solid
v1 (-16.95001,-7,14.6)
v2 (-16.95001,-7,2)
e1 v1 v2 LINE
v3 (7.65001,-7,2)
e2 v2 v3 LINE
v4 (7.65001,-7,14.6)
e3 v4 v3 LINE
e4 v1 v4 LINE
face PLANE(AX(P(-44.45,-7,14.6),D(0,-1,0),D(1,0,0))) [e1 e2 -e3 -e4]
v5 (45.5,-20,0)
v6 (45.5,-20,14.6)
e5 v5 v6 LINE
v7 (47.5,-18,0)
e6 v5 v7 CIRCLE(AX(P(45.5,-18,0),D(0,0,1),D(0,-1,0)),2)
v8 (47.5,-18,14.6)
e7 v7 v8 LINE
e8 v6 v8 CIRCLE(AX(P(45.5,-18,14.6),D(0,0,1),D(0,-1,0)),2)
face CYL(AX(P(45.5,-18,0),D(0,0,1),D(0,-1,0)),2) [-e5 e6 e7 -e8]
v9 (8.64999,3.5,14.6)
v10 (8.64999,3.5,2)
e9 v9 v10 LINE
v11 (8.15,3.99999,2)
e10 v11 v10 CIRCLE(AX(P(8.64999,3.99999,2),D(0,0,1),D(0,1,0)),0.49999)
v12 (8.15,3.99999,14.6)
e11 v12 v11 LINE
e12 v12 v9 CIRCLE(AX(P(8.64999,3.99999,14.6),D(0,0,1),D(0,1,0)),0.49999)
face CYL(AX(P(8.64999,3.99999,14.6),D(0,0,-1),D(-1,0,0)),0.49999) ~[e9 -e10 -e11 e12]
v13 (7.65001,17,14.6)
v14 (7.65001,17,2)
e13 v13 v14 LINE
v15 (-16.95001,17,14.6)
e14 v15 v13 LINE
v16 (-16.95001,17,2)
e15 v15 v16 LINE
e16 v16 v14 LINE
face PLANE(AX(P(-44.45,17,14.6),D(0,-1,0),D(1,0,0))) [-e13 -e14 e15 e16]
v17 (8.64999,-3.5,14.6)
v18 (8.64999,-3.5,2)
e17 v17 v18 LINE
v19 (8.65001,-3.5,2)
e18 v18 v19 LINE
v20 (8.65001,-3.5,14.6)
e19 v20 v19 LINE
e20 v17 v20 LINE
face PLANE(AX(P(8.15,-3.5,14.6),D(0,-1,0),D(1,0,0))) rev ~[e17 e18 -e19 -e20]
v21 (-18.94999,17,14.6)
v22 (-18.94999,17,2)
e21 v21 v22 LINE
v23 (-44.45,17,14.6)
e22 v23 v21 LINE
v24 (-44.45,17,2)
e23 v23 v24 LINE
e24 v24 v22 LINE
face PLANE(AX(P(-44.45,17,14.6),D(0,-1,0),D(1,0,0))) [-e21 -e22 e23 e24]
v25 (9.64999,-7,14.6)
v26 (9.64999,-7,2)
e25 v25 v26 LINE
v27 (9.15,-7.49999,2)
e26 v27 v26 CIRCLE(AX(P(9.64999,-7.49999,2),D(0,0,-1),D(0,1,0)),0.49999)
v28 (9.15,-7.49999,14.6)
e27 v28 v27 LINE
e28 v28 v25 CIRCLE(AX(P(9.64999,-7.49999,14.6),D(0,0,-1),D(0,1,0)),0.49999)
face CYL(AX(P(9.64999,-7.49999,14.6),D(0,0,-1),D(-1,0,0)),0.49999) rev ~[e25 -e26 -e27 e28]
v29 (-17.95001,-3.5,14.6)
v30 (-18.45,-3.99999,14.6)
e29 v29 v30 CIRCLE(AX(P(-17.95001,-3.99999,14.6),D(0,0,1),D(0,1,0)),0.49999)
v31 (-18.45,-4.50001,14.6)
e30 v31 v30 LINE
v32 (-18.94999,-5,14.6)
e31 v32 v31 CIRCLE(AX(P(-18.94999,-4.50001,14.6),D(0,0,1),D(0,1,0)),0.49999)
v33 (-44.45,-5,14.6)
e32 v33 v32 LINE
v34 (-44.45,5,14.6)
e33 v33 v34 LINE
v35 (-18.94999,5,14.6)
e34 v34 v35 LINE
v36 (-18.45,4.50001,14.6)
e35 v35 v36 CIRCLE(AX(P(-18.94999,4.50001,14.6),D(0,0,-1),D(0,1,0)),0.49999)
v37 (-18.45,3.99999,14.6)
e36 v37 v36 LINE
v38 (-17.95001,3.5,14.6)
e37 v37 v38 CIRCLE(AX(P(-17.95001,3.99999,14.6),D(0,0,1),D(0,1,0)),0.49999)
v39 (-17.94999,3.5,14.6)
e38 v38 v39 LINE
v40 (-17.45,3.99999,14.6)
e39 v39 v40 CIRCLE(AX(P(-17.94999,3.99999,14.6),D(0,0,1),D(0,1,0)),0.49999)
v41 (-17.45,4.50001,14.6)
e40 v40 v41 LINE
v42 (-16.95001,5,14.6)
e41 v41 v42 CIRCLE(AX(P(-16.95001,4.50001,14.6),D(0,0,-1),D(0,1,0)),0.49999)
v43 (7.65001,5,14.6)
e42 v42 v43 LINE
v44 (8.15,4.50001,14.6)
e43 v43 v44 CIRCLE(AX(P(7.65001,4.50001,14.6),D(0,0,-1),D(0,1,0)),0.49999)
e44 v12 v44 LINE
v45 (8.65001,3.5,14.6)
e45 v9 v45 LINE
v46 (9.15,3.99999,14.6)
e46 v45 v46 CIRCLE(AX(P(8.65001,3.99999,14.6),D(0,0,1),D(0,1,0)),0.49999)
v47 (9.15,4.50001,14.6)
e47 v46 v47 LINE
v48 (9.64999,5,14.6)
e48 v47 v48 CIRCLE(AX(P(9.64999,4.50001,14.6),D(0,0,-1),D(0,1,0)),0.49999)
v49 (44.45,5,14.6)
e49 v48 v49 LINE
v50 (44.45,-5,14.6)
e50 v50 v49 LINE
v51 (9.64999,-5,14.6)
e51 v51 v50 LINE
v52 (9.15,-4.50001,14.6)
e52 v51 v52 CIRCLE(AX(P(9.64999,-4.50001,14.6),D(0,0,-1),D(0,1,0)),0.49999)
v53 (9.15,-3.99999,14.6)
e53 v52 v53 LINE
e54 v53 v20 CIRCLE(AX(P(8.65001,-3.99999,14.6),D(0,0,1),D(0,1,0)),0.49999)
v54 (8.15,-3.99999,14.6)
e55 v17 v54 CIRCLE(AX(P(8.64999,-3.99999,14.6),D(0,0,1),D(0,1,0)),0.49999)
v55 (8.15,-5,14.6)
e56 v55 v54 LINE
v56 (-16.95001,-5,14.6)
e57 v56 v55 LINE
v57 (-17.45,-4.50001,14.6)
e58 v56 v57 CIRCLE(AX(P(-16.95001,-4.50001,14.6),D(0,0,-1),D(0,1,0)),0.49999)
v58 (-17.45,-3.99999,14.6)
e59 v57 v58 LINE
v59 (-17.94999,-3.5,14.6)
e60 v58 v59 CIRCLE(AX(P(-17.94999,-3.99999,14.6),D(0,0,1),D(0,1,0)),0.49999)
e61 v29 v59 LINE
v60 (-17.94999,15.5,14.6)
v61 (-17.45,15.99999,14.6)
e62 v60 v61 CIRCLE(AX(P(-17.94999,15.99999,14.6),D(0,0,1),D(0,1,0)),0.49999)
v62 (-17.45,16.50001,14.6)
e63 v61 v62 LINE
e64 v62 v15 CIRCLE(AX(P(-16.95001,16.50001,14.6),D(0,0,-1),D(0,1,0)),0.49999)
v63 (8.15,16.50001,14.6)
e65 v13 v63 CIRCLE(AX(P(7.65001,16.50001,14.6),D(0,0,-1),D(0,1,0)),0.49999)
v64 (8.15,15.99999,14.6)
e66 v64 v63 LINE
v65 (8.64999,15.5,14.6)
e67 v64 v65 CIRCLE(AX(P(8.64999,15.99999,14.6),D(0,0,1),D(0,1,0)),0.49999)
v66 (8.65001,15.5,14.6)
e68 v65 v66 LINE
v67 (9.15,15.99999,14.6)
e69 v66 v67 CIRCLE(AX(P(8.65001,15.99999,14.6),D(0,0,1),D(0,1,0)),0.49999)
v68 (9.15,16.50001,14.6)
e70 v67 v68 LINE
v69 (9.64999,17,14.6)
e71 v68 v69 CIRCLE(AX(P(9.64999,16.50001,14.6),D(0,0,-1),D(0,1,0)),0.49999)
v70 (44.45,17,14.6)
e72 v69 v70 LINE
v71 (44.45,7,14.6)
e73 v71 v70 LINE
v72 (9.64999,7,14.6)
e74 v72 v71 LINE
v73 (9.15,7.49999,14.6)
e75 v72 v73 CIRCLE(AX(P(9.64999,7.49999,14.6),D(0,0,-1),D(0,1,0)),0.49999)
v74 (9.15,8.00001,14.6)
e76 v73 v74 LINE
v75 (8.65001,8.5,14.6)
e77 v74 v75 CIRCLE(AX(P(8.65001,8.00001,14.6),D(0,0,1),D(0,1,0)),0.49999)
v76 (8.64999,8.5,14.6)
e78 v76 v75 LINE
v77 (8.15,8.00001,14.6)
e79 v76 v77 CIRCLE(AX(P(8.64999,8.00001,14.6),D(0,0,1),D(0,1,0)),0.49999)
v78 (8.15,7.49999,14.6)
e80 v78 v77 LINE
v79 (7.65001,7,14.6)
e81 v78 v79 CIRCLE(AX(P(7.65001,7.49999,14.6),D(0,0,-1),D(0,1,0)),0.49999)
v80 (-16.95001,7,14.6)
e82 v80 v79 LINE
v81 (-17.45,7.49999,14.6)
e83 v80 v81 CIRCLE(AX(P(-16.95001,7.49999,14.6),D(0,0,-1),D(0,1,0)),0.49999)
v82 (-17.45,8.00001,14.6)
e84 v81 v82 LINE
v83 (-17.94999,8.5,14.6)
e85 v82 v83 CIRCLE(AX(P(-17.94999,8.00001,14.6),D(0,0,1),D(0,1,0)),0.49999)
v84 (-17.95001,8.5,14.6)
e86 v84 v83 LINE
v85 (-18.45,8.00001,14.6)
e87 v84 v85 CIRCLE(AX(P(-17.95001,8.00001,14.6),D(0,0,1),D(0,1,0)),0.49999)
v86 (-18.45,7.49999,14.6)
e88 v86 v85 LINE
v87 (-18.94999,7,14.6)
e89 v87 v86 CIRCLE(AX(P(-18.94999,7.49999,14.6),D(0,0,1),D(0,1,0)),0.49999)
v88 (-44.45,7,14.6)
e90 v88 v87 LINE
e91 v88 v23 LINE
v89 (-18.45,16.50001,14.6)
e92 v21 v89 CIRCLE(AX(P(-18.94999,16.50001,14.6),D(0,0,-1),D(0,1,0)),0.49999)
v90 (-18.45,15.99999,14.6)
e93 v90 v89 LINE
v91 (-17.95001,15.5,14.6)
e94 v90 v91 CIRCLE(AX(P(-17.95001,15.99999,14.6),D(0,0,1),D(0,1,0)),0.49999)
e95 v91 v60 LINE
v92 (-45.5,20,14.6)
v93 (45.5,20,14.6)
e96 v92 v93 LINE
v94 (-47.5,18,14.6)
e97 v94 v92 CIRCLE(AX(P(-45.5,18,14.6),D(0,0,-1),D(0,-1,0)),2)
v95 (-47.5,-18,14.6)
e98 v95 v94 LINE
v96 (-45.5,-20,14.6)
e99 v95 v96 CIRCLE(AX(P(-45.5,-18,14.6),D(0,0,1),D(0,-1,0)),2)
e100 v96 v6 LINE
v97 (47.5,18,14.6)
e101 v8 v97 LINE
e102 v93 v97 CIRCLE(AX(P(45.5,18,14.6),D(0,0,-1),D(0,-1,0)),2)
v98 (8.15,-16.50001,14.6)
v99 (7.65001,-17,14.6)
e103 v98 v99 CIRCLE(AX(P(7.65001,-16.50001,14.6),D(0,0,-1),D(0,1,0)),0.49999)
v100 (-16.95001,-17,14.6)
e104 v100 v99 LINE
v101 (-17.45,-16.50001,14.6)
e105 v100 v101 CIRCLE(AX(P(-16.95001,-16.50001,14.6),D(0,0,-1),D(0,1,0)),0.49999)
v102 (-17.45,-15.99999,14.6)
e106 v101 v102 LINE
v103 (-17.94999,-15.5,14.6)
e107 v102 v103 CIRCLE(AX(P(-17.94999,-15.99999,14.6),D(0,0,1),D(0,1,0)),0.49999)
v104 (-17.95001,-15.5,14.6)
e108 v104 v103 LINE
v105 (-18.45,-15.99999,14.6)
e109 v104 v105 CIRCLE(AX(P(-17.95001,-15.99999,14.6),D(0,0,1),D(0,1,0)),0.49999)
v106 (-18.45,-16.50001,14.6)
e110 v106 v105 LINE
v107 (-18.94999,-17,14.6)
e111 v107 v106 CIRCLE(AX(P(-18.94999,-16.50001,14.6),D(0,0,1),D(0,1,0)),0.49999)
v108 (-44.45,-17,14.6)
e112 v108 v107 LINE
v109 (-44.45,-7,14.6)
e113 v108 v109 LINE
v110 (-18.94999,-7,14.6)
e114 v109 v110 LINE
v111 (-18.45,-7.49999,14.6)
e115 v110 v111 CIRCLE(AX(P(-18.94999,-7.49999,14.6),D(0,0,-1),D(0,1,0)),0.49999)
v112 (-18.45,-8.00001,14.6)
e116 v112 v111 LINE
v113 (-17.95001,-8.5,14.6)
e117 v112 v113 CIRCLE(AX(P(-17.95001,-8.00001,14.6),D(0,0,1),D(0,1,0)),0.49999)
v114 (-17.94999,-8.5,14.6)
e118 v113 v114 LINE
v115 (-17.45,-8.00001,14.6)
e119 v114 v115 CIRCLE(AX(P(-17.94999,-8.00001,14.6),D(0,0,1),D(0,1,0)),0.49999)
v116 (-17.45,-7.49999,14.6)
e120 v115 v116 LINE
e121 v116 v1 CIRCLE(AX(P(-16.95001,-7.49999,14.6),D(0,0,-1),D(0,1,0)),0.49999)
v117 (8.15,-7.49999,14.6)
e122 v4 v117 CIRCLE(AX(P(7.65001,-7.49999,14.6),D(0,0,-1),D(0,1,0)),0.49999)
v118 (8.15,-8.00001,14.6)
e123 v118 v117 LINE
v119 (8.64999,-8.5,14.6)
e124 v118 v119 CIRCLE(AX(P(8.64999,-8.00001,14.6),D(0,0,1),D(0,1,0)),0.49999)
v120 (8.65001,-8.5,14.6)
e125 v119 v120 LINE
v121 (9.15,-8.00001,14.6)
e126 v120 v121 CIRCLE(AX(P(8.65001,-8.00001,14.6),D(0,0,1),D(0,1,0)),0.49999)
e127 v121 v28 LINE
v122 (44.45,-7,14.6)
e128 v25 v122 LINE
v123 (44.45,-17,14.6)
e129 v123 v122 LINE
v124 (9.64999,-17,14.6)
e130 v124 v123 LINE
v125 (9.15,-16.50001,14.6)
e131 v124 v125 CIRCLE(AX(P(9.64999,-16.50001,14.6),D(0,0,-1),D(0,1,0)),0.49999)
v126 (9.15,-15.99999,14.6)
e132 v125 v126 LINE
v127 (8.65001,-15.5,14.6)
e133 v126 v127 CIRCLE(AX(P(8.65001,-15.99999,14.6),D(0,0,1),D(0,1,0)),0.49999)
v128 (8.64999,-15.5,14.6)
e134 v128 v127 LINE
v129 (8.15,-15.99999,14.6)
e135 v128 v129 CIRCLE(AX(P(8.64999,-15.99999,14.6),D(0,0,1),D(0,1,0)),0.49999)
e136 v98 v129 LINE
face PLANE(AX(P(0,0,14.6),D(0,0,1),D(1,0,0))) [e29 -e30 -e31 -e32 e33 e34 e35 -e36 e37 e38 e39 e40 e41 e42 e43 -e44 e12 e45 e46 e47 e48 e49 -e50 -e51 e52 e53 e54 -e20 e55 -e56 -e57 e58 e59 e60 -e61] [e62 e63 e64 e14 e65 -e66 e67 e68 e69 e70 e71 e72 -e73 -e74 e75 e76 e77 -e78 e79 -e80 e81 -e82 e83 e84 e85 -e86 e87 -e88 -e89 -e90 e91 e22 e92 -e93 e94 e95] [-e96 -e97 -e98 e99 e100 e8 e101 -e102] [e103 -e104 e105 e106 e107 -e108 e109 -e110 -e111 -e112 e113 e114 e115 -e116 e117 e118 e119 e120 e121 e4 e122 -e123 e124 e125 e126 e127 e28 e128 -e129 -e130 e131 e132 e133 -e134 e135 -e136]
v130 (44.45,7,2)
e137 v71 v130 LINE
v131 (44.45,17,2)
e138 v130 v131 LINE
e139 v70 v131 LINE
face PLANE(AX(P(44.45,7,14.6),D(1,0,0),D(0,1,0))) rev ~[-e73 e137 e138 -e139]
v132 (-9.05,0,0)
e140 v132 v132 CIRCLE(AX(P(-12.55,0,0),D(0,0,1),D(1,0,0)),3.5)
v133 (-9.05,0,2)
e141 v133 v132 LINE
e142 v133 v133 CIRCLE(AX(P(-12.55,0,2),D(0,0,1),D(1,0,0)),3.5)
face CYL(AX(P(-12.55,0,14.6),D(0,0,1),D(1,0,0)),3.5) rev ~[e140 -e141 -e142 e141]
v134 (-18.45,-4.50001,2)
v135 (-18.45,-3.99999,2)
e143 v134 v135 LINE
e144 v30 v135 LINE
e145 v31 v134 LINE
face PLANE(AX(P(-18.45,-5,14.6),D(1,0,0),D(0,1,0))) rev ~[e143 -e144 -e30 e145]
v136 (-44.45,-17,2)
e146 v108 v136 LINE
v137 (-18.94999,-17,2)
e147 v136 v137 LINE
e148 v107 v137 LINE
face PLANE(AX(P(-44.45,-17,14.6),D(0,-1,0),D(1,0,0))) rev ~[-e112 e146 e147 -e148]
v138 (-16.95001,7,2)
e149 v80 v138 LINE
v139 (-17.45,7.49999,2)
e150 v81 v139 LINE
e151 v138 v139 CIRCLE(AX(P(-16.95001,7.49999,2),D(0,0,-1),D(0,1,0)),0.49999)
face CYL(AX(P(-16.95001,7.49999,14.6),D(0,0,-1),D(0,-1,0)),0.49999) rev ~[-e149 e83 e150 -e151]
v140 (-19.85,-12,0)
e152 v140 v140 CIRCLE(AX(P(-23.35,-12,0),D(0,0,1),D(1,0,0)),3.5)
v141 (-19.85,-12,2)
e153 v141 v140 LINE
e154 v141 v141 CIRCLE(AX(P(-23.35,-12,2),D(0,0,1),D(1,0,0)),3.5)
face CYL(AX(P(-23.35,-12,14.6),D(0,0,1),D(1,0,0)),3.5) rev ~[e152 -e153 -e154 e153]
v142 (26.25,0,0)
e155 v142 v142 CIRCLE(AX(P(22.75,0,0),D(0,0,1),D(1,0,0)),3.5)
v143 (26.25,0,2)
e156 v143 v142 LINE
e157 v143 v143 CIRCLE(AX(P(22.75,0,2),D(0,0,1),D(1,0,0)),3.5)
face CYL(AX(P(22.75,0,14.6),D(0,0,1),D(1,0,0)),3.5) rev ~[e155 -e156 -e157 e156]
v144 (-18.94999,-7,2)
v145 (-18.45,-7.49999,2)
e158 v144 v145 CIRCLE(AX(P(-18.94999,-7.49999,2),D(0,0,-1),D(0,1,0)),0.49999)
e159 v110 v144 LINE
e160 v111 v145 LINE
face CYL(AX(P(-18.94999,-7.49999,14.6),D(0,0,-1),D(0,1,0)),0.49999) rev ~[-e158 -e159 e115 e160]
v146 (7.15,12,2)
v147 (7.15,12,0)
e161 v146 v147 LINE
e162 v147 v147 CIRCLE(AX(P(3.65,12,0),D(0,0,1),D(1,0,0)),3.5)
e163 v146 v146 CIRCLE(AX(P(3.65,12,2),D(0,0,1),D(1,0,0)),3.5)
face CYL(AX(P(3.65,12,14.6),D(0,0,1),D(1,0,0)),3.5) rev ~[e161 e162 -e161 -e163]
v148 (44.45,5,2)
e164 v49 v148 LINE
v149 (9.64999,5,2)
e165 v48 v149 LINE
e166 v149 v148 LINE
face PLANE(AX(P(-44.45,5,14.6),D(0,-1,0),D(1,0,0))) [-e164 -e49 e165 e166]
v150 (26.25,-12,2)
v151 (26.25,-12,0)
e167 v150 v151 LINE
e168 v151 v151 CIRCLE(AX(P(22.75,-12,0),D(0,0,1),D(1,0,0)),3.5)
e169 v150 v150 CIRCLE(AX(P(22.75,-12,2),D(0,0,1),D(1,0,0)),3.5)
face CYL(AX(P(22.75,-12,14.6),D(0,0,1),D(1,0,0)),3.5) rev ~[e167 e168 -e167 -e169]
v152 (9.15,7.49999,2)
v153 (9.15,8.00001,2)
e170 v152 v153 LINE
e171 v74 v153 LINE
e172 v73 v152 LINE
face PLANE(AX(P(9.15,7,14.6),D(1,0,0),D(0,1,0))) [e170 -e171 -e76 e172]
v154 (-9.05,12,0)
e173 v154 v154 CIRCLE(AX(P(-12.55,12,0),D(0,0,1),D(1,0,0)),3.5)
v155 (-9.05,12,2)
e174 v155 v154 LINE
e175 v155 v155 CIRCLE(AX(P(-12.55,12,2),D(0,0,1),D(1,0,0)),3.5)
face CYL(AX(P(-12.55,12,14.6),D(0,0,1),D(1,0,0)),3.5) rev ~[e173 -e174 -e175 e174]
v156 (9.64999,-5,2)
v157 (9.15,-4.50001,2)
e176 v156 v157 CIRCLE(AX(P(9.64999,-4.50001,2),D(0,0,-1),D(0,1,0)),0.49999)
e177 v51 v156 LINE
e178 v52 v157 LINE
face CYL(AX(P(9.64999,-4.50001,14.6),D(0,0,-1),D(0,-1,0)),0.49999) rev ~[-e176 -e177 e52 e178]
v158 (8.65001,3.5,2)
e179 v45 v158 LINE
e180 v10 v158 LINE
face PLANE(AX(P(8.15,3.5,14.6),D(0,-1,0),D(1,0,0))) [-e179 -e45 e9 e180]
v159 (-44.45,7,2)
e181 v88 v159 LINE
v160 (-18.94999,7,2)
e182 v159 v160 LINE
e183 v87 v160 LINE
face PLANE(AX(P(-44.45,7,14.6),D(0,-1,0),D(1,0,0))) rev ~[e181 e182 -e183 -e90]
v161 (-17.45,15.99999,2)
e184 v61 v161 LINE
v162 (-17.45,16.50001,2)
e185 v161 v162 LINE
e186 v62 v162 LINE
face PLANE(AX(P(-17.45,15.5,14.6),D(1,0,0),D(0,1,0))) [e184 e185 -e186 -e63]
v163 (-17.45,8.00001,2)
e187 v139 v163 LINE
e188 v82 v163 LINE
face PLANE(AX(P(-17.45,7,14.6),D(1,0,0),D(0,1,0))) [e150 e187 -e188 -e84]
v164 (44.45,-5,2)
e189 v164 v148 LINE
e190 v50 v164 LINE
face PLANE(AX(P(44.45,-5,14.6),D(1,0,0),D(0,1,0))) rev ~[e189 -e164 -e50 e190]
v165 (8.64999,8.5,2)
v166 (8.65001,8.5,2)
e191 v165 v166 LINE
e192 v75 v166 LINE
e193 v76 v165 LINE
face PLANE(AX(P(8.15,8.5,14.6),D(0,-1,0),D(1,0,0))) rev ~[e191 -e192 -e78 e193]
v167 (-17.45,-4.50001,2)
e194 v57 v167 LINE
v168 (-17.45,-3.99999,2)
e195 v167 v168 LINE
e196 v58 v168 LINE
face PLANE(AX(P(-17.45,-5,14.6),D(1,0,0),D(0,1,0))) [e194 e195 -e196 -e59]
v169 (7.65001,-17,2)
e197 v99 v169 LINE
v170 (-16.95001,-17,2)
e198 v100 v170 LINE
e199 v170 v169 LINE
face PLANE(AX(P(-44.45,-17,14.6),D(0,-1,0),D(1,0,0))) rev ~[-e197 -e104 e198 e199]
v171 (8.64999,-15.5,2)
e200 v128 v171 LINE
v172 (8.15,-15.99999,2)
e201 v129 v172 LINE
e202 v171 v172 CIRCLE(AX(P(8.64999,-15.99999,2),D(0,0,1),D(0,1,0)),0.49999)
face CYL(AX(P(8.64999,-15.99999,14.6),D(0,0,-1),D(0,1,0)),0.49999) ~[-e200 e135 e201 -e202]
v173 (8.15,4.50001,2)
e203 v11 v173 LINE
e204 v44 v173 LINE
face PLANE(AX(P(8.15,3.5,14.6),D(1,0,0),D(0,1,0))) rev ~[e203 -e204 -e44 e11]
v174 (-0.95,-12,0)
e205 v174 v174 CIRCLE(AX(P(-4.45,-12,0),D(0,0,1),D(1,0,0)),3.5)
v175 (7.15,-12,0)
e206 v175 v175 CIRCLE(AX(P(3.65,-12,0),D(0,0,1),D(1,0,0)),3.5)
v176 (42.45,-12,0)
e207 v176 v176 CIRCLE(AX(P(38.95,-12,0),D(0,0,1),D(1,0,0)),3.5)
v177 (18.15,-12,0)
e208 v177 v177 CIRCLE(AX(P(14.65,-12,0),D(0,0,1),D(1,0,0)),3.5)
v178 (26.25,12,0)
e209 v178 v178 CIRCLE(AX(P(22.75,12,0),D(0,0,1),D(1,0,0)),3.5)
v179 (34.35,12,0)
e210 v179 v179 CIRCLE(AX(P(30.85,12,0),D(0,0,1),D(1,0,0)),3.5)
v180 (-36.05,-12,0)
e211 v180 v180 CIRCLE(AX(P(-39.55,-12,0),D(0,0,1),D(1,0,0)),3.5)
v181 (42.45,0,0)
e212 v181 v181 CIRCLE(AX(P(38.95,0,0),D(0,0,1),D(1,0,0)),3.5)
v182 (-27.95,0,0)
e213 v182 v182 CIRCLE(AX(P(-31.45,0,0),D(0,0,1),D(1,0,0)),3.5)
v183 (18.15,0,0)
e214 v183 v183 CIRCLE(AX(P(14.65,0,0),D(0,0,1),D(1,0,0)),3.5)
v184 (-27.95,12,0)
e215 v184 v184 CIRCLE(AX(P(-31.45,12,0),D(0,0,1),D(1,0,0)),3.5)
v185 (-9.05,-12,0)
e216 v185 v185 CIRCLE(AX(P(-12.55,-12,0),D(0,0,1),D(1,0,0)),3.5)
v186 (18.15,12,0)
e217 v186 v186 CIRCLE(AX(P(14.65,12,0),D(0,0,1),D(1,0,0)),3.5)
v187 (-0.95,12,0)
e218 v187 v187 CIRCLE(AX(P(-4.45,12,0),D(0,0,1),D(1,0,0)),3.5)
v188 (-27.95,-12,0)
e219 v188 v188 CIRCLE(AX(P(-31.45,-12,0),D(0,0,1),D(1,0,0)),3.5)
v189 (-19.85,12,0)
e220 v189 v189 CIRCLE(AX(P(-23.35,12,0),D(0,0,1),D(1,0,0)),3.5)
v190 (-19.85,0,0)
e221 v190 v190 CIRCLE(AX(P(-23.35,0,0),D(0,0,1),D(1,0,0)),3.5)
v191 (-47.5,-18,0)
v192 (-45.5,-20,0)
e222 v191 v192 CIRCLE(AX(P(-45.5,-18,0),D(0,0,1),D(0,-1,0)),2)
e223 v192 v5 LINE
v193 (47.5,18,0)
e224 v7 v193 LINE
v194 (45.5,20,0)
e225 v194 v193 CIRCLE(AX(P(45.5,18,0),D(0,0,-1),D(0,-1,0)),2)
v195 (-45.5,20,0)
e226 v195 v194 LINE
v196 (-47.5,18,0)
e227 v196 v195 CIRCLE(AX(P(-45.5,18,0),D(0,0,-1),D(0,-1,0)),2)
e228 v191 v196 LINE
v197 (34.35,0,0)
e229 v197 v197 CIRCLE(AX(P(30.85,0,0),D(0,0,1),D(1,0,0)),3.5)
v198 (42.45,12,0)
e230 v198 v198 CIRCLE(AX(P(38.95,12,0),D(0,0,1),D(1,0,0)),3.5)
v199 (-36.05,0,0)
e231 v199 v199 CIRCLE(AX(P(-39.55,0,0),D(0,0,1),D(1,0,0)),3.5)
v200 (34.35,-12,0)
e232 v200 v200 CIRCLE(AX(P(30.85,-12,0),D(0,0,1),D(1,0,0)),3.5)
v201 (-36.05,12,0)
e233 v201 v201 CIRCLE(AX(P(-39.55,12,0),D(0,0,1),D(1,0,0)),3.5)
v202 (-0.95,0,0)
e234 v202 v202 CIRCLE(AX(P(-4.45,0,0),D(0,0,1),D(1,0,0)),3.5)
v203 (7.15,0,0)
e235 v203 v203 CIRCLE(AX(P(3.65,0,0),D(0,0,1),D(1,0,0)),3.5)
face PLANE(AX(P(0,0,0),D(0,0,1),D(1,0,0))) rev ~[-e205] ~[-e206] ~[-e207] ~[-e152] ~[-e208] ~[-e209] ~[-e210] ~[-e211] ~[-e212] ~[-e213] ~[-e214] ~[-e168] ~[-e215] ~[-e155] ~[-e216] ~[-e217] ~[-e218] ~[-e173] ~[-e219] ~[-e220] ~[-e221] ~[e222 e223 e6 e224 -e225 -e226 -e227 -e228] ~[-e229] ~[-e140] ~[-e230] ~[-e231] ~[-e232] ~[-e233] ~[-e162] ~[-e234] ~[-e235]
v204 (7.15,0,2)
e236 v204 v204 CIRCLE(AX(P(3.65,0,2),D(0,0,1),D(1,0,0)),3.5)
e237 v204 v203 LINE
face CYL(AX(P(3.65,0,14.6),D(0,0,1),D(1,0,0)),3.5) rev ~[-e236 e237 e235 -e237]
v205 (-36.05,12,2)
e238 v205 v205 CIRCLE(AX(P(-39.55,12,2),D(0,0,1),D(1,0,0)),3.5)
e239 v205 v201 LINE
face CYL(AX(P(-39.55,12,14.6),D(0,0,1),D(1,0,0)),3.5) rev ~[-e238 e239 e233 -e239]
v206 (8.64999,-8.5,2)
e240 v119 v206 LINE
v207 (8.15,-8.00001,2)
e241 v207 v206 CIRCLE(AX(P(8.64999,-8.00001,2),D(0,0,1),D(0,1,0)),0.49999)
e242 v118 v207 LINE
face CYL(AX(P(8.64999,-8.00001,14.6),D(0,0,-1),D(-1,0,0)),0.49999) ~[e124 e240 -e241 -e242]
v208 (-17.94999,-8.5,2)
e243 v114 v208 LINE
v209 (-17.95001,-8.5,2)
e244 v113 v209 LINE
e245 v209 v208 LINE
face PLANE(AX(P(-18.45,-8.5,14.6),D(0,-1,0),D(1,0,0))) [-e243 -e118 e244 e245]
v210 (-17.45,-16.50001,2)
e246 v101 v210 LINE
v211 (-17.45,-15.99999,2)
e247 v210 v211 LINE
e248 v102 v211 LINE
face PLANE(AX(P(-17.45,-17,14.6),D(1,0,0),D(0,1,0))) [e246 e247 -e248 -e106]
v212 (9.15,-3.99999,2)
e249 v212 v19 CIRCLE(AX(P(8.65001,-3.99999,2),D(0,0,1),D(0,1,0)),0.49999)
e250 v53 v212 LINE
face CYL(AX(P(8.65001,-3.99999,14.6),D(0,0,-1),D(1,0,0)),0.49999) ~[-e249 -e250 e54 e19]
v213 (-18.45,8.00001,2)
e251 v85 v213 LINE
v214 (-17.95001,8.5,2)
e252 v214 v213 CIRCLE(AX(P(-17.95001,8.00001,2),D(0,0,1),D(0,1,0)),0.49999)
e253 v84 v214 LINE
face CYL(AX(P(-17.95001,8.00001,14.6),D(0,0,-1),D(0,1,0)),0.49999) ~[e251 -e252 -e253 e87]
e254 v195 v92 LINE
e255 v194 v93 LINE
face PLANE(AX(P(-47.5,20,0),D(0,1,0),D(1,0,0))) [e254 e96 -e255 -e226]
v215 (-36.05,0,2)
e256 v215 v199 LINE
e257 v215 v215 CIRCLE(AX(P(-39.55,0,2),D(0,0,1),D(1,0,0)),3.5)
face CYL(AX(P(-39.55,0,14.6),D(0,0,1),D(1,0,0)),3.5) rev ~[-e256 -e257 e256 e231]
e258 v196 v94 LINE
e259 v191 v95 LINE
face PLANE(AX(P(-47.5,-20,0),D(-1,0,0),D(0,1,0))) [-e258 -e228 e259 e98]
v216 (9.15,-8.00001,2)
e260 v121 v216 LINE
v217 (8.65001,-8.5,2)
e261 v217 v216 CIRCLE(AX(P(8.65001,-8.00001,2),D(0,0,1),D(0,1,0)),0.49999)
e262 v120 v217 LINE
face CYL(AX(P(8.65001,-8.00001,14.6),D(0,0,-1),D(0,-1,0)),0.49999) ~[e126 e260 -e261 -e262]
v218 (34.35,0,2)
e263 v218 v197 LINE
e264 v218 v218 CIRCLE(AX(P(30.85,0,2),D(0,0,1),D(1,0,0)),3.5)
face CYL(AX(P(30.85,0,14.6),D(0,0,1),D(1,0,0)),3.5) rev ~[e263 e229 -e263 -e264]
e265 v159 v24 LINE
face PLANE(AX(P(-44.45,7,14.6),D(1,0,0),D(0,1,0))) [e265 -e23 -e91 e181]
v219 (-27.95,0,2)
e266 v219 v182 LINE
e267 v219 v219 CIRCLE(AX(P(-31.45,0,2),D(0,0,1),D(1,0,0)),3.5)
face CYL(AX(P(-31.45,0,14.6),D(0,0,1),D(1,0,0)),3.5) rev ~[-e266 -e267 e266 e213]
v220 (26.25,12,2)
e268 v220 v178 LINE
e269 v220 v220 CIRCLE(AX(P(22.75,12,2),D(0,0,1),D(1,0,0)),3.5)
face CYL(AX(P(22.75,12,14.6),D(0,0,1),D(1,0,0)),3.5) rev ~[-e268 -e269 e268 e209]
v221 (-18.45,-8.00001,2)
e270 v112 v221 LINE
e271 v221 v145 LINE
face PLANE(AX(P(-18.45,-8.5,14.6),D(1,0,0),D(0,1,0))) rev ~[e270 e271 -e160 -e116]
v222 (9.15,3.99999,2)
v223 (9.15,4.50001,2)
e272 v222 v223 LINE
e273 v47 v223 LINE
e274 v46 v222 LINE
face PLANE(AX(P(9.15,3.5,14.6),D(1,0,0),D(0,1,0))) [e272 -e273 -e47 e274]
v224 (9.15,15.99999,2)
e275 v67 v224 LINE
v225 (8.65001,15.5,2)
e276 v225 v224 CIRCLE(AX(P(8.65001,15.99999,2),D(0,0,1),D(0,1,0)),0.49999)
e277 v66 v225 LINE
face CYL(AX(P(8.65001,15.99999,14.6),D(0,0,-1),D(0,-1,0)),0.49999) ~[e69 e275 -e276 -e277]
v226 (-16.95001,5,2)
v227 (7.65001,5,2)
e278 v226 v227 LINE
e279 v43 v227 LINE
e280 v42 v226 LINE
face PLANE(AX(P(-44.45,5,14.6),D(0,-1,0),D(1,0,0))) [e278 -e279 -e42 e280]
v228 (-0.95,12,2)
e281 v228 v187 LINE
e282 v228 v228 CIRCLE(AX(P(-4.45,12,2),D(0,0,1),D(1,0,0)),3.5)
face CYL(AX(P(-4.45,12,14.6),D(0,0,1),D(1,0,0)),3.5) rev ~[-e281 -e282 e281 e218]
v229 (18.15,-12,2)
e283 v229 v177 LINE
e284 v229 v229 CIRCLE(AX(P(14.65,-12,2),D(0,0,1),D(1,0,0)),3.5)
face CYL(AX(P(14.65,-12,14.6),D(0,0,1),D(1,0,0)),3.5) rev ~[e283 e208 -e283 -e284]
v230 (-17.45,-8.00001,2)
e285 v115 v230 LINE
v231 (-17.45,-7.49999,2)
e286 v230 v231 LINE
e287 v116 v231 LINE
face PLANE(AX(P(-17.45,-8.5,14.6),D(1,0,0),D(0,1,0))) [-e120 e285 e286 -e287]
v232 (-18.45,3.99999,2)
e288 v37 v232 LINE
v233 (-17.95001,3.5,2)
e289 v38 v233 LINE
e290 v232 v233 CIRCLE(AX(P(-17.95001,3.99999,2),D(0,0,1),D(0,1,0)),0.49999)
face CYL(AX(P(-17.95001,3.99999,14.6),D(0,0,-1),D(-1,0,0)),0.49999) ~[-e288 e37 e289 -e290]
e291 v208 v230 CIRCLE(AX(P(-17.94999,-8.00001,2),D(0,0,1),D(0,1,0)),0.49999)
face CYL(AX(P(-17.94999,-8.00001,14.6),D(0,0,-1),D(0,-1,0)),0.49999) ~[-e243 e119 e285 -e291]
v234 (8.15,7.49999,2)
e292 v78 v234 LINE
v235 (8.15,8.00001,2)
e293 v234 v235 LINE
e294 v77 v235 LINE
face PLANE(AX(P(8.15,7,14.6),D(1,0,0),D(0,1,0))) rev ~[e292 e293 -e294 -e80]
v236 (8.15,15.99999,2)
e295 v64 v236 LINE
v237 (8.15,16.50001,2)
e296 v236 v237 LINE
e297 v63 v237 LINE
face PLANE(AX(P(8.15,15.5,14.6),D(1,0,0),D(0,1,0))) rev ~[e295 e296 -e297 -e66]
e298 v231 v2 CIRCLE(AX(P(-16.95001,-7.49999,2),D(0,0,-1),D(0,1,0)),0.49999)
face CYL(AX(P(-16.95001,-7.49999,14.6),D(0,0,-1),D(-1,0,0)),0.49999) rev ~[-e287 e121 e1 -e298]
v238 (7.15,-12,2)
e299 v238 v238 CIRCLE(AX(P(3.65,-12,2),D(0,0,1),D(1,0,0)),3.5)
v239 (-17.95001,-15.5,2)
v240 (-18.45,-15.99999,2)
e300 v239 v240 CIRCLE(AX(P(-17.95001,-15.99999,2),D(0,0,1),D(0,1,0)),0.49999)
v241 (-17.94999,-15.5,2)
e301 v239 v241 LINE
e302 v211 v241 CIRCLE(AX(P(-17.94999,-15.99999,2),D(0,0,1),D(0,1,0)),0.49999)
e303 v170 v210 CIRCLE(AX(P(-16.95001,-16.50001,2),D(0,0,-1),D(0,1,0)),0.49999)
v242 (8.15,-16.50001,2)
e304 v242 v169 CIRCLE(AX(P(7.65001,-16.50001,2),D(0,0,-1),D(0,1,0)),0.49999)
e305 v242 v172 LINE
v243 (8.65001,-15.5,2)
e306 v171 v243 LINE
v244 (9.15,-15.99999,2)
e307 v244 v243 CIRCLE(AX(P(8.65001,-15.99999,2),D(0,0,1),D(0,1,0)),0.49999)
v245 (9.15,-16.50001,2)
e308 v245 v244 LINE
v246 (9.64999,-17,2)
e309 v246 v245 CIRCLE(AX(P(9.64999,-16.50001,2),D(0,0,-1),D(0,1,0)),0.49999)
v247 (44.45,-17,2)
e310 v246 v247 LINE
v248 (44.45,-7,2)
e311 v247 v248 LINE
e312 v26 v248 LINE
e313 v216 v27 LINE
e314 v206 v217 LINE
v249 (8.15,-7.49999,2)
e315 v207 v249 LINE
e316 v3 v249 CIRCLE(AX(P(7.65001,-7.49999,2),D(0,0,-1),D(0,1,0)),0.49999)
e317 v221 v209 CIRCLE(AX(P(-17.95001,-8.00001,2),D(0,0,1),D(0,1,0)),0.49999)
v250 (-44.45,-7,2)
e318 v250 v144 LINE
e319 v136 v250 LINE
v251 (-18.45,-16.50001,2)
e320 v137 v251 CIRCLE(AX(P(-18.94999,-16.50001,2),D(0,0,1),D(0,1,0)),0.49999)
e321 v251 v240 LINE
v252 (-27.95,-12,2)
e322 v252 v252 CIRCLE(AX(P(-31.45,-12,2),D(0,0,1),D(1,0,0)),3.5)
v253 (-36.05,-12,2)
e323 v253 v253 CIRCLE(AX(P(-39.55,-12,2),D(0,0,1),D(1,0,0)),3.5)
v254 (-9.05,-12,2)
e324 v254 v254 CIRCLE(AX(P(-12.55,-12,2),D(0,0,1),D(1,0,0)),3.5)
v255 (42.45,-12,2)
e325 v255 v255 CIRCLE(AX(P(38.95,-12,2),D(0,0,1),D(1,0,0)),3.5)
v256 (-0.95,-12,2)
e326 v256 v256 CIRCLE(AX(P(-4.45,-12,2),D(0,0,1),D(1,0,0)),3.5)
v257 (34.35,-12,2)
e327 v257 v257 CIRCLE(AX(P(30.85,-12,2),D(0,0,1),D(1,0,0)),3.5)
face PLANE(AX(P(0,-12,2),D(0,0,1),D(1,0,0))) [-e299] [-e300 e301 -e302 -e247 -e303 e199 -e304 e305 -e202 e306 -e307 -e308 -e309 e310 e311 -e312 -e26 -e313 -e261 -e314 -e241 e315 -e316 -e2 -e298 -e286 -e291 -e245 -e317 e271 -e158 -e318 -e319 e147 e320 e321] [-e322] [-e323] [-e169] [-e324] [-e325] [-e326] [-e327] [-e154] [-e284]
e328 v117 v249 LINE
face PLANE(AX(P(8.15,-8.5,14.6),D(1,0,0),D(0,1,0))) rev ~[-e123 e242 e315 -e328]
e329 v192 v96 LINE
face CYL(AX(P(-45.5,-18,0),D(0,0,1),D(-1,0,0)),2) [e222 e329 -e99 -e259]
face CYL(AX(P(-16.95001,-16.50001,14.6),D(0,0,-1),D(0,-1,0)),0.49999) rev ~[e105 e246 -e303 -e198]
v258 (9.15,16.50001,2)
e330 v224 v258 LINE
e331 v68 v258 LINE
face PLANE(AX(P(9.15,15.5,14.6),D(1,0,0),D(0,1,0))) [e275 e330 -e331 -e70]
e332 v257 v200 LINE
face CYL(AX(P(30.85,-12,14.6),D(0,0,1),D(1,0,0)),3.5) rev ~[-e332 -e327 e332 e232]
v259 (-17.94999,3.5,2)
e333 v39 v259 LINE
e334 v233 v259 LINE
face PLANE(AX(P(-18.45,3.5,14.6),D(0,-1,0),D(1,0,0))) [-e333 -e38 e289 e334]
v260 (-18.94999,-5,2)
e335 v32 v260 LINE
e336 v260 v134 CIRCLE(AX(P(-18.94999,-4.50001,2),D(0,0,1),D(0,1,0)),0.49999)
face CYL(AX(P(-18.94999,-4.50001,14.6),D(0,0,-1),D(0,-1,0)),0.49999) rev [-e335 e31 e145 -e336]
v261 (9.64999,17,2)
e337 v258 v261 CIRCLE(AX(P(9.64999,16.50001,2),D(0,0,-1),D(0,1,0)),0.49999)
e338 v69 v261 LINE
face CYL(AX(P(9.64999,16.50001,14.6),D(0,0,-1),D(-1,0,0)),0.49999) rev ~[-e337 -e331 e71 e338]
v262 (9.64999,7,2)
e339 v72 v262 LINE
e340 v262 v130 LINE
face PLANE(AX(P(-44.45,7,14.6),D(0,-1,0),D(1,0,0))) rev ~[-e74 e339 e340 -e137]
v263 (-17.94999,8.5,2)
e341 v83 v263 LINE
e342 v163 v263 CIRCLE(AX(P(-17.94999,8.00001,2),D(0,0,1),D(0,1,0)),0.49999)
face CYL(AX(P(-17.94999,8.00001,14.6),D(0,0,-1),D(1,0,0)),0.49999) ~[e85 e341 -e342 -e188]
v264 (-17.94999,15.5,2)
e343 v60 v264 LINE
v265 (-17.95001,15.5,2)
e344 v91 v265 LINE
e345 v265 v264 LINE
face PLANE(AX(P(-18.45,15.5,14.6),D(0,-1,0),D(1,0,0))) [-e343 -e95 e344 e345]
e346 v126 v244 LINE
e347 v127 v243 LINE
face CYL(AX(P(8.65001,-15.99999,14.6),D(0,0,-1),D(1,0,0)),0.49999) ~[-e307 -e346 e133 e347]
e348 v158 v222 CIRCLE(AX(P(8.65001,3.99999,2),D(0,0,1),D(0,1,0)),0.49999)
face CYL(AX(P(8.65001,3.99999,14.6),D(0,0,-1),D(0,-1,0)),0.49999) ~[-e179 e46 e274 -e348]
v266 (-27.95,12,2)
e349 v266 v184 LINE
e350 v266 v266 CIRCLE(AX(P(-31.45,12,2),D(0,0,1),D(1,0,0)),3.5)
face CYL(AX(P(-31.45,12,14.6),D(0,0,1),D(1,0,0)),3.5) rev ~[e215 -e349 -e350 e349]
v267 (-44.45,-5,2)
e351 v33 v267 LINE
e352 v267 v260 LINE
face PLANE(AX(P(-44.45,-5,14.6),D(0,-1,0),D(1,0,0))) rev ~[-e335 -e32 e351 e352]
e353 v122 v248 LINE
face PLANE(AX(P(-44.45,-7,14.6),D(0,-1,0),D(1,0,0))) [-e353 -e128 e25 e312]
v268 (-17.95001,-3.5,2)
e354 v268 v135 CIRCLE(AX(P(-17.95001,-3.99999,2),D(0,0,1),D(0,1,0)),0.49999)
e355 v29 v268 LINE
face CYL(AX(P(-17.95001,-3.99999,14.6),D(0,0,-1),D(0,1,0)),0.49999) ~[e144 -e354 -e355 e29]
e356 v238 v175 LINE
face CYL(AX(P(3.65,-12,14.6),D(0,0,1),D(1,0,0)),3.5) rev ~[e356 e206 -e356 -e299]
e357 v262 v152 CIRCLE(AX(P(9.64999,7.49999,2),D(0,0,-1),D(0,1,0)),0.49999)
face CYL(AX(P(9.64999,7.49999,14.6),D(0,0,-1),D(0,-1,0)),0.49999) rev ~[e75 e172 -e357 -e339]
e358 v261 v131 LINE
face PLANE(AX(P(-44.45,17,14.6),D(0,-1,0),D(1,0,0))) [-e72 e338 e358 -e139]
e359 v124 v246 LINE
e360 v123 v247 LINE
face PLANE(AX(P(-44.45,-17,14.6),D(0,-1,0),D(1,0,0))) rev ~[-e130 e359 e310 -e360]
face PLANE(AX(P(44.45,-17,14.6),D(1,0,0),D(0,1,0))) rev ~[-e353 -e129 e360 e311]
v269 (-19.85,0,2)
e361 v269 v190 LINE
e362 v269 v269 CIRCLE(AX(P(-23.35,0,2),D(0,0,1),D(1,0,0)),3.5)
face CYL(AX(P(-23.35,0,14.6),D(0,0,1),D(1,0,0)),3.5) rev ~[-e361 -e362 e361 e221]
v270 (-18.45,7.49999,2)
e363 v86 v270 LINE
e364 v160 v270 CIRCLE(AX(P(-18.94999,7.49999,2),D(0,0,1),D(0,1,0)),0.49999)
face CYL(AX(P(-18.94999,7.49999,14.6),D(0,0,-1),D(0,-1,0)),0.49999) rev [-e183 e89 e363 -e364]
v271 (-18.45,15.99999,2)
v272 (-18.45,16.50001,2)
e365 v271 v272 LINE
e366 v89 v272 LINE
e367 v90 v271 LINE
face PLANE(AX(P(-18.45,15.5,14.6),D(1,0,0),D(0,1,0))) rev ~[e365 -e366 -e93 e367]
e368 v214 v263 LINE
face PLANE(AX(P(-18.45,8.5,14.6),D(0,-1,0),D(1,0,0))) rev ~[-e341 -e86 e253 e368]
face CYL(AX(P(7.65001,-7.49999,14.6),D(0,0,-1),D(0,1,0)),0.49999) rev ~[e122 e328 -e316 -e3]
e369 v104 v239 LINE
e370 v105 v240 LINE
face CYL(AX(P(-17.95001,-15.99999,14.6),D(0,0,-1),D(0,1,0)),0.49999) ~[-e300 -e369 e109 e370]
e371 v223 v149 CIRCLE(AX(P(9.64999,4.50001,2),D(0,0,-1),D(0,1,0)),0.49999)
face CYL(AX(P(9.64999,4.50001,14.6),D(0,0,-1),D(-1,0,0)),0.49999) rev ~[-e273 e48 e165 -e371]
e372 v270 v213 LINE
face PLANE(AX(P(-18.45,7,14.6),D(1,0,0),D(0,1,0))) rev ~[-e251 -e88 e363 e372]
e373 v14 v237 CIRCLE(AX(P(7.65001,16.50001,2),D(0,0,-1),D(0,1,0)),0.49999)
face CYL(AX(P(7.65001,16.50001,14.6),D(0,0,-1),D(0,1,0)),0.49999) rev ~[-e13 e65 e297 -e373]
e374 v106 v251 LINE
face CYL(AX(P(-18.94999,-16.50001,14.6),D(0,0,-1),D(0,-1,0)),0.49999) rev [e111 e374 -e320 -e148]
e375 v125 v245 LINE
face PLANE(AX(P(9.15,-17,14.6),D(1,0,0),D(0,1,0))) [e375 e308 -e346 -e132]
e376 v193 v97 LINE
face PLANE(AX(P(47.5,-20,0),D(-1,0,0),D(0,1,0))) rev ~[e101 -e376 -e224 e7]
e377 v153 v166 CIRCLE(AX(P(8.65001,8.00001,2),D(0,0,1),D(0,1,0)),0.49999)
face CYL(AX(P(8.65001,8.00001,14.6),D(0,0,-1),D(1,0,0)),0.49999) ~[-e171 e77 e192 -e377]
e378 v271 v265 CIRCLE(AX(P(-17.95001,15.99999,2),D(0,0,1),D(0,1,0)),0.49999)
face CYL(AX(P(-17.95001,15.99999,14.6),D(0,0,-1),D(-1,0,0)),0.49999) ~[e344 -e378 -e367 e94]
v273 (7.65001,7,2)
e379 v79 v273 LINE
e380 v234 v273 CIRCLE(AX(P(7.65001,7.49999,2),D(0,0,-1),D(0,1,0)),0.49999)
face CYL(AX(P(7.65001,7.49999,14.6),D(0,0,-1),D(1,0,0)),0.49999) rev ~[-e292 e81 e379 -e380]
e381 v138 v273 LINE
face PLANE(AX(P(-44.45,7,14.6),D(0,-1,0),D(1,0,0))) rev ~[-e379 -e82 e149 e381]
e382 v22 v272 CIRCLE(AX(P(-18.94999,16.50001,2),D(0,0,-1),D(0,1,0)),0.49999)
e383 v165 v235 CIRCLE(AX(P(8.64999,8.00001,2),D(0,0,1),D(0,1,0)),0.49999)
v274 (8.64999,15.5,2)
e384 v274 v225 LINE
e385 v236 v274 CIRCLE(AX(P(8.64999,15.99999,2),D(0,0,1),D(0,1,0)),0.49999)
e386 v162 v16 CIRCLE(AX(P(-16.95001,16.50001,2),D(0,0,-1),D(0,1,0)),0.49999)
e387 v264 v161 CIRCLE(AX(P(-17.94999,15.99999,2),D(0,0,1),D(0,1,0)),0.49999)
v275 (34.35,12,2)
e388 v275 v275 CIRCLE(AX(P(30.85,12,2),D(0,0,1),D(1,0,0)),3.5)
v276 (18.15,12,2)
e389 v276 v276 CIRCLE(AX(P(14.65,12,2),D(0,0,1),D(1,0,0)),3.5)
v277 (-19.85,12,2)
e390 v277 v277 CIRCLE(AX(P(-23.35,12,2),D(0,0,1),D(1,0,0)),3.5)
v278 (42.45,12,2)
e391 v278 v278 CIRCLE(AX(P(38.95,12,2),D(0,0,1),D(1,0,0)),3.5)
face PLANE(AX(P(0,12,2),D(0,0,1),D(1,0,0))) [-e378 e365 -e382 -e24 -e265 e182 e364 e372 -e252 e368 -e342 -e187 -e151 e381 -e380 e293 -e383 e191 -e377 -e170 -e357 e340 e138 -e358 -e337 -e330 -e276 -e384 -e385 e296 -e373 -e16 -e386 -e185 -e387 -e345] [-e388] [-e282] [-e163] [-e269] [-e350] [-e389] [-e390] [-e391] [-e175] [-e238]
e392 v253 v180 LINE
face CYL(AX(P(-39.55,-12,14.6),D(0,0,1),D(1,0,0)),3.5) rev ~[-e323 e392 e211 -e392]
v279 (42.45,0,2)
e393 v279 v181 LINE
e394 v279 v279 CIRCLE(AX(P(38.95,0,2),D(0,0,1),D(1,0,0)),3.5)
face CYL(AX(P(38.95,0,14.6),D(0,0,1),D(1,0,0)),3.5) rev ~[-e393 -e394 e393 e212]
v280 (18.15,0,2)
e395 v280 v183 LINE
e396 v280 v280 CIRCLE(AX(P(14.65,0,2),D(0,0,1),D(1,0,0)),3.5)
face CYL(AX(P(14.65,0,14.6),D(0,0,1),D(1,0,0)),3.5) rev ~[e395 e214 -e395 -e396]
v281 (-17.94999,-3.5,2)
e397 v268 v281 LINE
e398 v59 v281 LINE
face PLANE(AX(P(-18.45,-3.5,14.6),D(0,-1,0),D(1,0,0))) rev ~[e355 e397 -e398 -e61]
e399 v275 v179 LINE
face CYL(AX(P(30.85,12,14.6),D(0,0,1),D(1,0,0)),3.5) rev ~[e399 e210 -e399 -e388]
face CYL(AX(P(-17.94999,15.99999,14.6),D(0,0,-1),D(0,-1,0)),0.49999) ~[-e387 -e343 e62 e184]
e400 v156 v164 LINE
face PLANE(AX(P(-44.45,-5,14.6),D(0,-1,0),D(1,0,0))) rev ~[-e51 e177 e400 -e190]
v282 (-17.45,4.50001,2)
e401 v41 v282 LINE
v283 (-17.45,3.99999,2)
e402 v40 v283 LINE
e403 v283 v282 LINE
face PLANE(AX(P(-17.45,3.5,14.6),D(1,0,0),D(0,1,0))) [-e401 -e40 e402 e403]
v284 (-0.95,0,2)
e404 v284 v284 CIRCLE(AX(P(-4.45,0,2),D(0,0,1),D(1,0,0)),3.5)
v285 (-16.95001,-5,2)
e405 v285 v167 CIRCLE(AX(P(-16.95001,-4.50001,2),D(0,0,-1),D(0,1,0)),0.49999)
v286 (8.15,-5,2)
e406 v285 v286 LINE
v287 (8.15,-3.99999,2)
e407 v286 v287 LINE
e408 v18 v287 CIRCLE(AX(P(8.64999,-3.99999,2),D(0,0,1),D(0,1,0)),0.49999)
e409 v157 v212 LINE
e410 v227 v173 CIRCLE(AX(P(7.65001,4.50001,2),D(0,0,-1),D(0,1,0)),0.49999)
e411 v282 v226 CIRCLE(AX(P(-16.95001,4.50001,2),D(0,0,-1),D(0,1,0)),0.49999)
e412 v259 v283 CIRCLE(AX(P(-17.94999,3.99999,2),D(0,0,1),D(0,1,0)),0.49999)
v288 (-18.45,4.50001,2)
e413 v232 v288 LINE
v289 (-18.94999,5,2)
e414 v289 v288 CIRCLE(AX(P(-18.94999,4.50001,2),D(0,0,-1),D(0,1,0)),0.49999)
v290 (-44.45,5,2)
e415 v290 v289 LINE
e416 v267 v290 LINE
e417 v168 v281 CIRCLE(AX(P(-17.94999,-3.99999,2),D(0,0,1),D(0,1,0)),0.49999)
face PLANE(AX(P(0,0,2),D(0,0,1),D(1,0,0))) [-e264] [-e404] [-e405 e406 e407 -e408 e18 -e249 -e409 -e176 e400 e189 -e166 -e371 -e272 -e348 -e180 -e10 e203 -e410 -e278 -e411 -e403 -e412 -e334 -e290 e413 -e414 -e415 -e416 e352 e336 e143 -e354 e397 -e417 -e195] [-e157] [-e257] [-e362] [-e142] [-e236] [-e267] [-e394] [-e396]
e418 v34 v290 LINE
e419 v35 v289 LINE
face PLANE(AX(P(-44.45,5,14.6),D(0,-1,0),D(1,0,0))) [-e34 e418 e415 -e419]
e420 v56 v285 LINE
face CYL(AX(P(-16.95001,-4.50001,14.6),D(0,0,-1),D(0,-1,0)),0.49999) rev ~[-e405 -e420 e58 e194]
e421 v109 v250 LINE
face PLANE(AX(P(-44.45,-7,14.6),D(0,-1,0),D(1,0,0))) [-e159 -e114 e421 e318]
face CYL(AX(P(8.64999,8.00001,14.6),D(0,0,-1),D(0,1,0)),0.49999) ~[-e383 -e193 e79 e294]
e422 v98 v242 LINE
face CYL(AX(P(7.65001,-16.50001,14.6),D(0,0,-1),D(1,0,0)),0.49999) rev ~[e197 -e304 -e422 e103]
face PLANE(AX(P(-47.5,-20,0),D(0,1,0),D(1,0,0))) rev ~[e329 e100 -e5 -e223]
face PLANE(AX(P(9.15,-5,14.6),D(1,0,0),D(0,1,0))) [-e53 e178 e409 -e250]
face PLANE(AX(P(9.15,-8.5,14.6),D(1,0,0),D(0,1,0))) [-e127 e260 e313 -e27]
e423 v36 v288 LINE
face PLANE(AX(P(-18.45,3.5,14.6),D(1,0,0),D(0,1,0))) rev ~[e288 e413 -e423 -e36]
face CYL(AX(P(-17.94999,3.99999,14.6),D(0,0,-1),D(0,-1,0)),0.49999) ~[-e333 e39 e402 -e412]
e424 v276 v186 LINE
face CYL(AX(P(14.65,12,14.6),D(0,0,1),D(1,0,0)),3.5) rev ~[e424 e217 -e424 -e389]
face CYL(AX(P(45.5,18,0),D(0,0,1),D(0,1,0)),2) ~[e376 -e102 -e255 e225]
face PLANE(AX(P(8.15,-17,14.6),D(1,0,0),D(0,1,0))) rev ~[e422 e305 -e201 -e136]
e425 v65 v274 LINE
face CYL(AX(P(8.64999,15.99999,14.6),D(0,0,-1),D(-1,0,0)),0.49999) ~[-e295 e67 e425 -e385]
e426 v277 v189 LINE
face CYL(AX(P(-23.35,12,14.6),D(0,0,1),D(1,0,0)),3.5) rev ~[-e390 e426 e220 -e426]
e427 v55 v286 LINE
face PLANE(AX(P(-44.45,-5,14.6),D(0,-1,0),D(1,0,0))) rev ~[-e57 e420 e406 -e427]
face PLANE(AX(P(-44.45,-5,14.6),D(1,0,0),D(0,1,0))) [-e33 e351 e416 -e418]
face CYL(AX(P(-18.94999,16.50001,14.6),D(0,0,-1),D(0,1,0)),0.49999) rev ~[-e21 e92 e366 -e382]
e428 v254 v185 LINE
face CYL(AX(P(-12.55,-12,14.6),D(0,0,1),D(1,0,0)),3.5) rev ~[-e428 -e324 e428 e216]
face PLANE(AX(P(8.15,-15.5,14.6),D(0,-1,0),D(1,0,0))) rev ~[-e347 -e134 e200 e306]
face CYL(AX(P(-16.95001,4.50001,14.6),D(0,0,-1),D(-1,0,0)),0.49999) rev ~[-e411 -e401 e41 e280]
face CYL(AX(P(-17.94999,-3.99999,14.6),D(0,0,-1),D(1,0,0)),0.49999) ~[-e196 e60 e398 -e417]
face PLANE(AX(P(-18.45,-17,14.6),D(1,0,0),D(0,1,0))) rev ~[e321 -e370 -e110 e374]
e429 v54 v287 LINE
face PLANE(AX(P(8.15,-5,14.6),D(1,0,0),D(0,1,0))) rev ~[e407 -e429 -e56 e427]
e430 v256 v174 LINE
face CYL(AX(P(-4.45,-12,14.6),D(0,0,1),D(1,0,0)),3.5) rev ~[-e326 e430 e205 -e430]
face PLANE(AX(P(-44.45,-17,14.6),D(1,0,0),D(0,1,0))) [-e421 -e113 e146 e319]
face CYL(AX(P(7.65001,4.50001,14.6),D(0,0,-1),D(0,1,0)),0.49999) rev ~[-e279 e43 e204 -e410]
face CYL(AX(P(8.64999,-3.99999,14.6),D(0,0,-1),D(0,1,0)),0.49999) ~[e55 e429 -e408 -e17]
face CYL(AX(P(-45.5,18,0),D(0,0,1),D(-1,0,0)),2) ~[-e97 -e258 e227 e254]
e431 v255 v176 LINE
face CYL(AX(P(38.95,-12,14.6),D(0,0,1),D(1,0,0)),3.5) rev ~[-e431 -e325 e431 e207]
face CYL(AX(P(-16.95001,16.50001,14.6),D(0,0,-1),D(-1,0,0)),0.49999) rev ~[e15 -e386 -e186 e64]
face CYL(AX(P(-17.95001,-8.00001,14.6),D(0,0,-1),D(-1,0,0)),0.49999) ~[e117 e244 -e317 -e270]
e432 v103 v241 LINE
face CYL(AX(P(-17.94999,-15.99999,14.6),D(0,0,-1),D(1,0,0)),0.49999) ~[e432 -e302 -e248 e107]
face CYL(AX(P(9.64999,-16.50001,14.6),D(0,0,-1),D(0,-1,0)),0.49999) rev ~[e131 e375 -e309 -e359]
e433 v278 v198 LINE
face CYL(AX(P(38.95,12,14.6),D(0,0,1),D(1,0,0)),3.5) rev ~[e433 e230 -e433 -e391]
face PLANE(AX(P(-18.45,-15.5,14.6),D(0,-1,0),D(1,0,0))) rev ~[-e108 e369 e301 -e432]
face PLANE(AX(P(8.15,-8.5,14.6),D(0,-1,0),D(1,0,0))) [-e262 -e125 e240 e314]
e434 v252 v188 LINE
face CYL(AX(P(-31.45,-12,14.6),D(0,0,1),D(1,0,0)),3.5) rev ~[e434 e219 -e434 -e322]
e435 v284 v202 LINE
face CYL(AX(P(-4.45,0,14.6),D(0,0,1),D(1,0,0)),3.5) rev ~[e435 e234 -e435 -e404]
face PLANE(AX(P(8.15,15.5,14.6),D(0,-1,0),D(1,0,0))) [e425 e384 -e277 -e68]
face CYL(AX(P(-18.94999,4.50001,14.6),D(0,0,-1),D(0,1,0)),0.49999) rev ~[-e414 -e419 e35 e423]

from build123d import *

# Parameters (mm, degrees)
F0_W     = 95
F0_H     = 40
F1_DEPTH = 14.6
F2_W     = 88.9
F2_H     = 10
F3_DEPTH = 12.6
F4_W     = 1
F4_H     = 1.5
F5_DEPTH = 12.6
F6_R     = 3.5
F7_DEPTH = 14.601
F8_R     = 2
F9_R     = 0.49999


# Not quite as in the source:
# - a fillet or chamfer is up to 0.001 mm smaller than in the source, because OpenCascade refuses the exact size


with BuildPart() as f1:
    # F0 (on Top) → F1 (new body)
    with BuildSketch(Plane.XY):
        Rectangle(F0_W, F0_H)
    extrude(amount=F1_DEPTH)

    # F2 (on face) → F3 (cut)
    with BuildSketch(Plane.XY.offset(14.6)):
        with Locations((0, 12)):
            Rectangle(F2_W, F2_H)
        Rectangle(F2_W, F2_H)
        with Locations((0, -12)):
            Rectangle(F2_W, F2_H)
    extrude(amount=-F3_DEPTH, mode=Mode.SUBTRACT)

    # F4 (on face) → F5 (join, through all)
    with BuildSketch(Plane.XY.offset(14.6)):
        with Locations((-17.95, 16.25)):
            Rectangle(F4_W, F4_H)
        with Locations((8.65, 16.25)):
            Rectangle(F4_W, F4_H)
        with Locations((8.65, 7.75)):
            Rectangle(F4_W, F4_H)
        with Locations((-17.95, 7.75)):
            Rectangle(F4_W, F4_H)
        with Locations((-17.95, 4.25)):
            Rectangle(F4_W, F4_H)
        with Locations((8.65, 4.25)):
            Rectangle(F4_W, F4_H)
        with Locations((8.65, -16.25)):
            Rectangle(F4_W, F4_H)
        with Locations((-17.95, -16.25)):
            Rectangle(F4_W, F4_H)
        with Locations((-17.95, -4.25)):
            Rectangle(F4_W, F4_H)
        with Locations((-17.95, -7.75)):
            Rectangle(F4_W, F4_H)
        with Locations((8.65, -4.25)):
            Rectangle(F4_W, F4_H)
        with Locations((8.65, -7.75)):
            Rectangle(F4_W, F4_H)
    extrude(amount=-F5_DEPTH)

    # F6 (on face) → F7 (cut, through all)
    with BuildSketch(Plane.XY.offset(14.6)):
        with Locations((-39.55, 12)):
            Circle(F6_R)
        with Locations((-31.45, 12)):
            Circle(F6_R)
        with Locations((-23.35, 12)):
            Circle(F6_R)
        with Locations((-12.55, 12)):
            Circle(F6_R)
        with Locations((-4.45, 12)):
            Circle(F6_R)
        with Locations((3.65, 12)):
            Circle(F6_R)
        with Locations((14.65, 12)):
            Circle(F6_R)
        with Locations((22.75, 12)):
            Circle(F6_R)
        with Locations((30.85, 12)):
            Circle(F6_R)
        with Locations((38.95, 12)):
            Circle(F6_R)
        with Locations((-39.55, 0)):
            Circle(F6_R)
        with Locations((-31.45, 0)):
            Circle(F6_R)
        with Locations((-23.35, 0)):
            Circle(F6_R)
        with Locations((-12.55, 0)):
            Circle(F6_R)
        with Locations((-4.45, 0)):
            Circle(F6_R)
        with Locations((3.65, 0)):
            Circle(F6_R)
        with Locations((14.65, 0)):
            Circle(F6_R)
        with Locations((22.75, 0)):
            Circle(F6_R)
        with Locations((30.85, 0)):
            Circle(F6_R)
        with Locations((38.95, 0)):
            Circle(F6_R)
        with Locations((-39.55, -12)):
            Circle(F6_R)
        with Locations((-31.45, -12)):
            Circle(F6_R)
        with Locations((-23.35, -12)):
            Circle(F6_R)
        with Locations((-12.55, -12)):
            Circle(F6_R)
        with Locations((-4.45, -12)):
            Circle(F6_R)
        with Locations((3.65, -12)):
            Circle(F6_R)
        with Locations((14.65, -12)):
            Circle(F6_R)
        with Locations((22.75, -12)):
            Circle(F6_R)
        with Locations((30.85, -12)):
            Circle(F6_R)
        with Locations((38.95, -12)):
            Circle(F6_R)
    extrude(amount=-F7_DEPTH, mode=Mode.SUBTRACT)

    # F8
    f8_edges = [f1.edges().sort_by_distance(p)[0] for p in [
        (-47.5, -20, 7.3),
        (47.5, -20, 7.3),
        (47.5, 20, 7.3),
        (-47.5, 20, 7.3),
    ]]
    fillet(f8_edges, radius=F8_R)

    # F9 (radius 0.5 in the source; OpenCascade refuses exactly that, so slightly less here)
    f9_edges = [f1.edges().sort_by_distance(p)[0] for p in [
        (-18.45, 17, 8.3),
        (-18.45, 15.5, 8.3),
        (-17.45, 15.5, 8.3),
        (8.15, 17, 8.3),
        (8.15, 15.5, 8.3),
        (9.15, 15.5, 8.3),
        (8.15, 8.5, 8.3),
        (-18.45, 8.5, 8.3),
        (-18.45, 5, 8.3),
        (-18.45, 3.5, 8.3),
        (-17.45, 3.5, 8.3),
        (8.15, 5, 8.3),
        (8.15, 3.5, 8.3),
        (-18.45, -3.5, 8.3),
        (8.15, -3.5, 8.3),
        (-18.45, -8.5, 8.3),
        (-17.45, -8.5, 8.3),
        (-18.45, -7, 8.3),
        (8.15, -7, 8.3),
        (8.15, -8.5, 8.3),
        (9.15, -8.5, 8.3),
        (8.15, -15.5, 8.3),
        (-18.45, -15.5, 8.3),
        (-17.45, -17, 8.3),
        (-17.45, -15.5, 8.3),
        (9.15, -17, 8.3),
        (9.15, -15.5, 8.3),
        (9.15, -5, 8.3),
        (9.15, -3.5, 8.3),
        (9.15, 8.5, 8.3),
        (9.15, 3.5, 8.3),
        (-17.45, -3.5, 8.3),
        (-17.45, -5, 8.3),
        (-17.45, 8.5, 8.3),
        (-17.45, 7, 8.3),
        (9.15, 7, 8.3),
        (8.15, -17, 8.3),
        (-18.45, -17, 8.3),
        (-18.45, -5, 8.3),
        (-18.45, 7, 8.3),
        (8.15, 7, 8.3),
        (9.15, -7, 8.3),
        (9.15, 5, 8.3),
        (-17.45, 5, 8.3),
        (-17.45, -7, 8.3),
        (9.15, 17, 8.3),
        (-17.45, 17, 8.3),
    ]]
    fillet(f9_edges, radius=F9_R)


solid = f1.part
